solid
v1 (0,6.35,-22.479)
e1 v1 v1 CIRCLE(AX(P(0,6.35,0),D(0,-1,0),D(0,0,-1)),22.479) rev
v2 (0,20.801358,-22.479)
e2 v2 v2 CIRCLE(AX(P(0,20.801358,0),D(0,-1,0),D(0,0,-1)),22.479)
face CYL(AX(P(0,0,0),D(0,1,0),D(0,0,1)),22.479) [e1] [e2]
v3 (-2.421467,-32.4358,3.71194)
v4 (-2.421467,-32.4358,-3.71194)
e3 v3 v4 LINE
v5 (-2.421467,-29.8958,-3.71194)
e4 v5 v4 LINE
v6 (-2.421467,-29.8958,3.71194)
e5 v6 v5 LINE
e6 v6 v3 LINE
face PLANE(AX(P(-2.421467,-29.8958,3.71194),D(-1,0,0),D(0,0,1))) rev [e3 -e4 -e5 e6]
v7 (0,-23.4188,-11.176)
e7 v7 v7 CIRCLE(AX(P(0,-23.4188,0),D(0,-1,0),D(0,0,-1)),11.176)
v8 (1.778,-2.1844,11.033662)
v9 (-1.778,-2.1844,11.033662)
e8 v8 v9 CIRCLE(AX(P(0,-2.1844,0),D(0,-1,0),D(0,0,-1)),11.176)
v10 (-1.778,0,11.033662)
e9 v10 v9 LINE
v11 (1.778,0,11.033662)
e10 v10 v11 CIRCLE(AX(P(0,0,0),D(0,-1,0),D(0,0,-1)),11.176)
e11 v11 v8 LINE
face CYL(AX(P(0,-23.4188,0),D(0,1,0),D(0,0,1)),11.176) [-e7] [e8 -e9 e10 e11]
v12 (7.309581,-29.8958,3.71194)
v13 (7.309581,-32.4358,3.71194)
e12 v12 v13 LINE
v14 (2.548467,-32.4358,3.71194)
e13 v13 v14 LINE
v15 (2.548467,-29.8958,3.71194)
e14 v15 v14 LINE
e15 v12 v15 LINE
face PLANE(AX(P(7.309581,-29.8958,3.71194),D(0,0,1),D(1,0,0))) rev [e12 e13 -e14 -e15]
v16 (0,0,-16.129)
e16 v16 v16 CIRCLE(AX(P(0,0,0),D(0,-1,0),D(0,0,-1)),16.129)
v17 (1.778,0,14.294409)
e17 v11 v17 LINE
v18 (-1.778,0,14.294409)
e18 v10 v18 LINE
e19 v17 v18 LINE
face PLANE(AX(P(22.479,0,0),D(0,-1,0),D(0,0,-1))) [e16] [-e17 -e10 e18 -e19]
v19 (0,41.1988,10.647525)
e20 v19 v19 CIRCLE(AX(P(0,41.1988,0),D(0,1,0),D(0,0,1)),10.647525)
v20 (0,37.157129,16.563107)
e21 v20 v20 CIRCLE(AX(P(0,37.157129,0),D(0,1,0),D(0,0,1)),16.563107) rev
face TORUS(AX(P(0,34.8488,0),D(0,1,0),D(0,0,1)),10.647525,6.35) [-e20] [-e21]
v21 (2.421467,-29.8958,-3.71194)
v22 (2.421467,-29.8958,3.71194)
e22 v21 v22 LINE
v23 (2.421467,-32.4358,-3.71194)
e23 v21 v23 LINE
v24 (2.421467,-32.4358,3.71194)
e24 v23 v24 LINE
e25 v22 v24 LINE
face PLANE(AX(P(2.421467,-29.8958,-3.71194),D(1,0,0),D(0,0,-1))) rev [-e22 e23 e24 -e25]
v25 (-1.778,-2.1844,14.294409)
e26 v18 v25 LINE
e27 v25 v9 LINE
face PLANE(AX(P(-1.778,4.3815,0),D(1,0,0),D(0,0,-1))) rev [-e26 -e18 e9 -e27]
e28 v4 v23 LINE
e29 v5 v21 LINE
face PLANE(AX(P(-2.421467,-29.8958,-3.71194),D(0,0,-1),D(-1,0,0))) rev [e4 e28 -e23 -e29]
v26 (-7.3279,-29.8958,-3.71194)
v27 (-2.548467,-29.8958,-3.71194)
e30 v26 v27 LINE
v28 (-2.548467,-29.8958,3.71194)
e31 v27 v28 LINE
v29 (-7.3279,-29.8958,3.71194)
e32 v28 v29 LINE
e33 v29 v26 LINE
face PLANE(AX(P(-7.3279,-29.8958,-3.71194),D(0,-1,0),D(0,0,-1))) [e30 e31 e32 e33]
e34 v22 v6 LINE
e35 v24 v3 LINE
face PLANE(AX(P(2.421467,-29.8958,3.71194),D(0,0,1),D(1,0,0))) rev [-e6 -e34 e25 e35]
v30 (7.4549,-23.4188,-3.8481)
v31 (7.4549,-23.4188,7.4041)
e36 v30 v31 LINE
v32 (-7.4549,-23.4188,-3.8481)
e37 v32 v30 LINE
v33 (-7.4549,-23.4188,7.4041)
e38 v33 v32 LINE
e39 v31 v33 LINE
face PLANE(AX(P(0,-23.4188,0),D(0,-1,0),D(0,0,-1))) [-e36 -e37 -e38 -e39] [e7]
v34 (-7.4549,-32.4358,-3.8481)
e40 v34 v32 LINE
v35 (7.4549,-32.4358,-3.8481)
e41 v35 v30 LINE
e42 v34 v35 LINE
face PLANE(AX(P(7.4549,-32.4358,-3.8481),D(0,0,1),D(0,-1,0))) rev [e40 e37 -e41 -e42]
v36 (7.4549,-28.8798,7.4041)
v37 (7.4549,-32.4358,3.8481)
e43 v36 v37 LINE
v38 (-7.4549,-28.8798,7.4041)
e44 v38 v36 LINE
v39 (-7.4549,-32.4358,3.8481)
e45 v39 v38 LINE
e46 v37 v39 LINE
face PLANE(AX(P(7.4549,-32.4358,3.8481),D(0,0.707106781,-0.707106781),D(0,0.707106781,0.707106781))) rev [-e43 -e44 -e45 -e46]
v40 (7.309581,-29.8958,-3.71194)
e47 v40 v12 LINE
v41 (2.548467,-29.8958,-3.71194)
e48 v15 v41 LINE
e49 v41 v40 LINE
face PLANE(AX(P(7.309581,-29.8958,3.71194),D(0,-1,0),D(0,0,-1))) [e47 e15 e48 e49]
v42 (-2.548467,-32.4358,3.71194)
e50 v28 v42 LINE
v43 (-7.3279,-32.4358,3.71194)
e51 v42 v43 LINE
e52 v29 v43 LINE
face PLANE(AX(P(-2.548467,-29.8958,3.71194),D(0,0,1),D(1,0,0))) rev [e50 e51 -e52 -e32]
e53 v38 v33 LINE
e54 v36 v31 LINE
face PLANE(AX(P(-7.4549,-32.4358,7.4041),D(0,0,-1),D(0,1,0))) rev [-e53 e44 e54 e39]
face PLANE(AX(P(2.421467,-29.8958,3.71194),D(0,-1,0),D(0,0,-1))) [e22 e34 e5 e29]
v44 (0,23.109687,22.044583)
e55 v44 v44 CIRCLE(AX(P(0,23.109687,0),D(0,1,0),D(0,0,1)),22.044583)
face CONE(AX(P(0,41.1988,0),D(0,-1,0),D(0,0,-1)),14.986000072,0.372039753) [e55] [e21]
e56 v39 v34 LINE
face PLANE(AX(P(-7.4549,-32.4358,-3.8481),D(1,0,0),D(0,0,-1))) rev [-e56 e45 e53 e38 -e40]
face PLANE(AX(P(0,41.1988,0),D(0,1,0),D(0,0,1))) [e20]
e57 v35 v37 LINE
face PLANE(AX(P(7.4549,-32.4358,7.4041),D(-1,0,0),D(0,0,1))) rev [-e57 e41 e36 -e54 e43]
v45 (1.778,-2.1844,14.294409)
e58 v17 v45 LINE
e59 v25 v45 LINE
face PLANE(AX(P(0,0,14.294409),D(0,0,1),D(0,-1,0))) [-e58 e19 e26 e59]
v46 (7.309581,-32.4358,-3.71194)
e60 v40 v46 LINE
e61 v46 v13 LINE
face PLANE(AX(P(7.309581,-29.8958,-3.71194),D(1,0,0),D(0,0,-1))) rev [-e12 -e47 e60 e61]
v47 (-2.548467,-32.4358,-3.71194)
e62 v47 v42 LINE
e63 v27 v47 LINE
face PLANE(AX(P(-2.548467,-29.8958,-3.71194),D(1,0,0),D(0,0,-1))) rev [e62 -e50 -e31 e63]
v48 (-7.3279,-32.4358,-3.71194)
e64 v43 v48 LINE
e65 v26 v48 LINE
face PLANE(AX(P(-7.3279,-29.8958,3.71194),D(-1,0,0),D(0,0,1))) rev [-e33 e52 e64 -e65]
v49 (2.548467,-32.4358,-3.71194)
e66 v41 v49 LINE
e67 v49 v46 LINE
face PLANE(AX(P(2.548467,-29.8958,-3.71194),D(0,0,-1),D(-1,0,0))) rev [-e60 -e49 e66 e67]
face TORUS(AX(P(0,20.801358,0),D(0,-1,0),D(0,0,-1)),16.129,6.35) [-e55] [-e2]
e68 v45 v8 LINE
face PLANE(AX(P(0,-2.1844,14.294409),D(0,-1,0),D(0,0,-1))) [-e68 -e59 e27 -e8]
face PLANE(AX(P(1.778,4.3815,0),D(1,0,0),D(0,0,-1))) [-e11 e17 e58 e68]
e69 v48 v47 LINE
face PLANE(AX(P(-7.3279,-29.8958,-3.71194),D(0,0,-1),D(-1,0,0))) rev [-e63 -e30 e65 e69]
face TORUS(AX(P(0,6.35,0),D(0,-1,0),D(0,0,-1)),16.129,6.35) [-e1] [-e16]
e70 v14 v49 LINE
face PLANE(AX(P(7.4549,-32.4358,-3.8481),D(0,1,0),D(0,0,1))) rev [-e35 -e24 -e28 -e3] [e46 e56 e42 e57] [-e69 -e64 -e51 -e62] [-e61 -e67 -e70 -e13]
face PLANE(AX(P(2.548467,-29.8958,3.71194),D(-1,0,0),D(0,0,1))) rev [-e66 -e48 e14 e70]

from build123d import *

# Parameters (mm, degrees)
SKETCH2_R           = 11.176
BOSS_EXTRUDE1_DEPTH = 23.4188
SKETCH3_W           = 14.9098
SKETCH3_H           = 11.2522
BOSS_EXTRUDE2_DEPTH = 9.017
SKETCH4_W           = 4.842933334
SKETCH4_H           = 7.423880536
CUT_EXTRUDE1_DEPTH  = 2.54
SKETCH5_W           = 4.779433333
SKETCH5_H           = 7.423880536
CUT_EXTRUDE2_DEPTH  = 2.54
SKETCH6_W           = 4.761113869
SKETCH6_H           = 7.423880536
CUT_EXTRUDE3_DEPTH  = 2.54
RIB1_START          = -1.778
RIB1_OUTLINE_W      = 3.294408818
RIB1_OUTLINE_H      = 2.1844
RIB1_DEPTH          = 3.556
CHAMFER1_SIZE       = 3.556
FILLET1_R           = 6.35


# Read off the part's stored shape, not the designer's step: Rib1
with BuildPart() as part:
    # Sketch1 → Revolve1 (revolve)
    with BuildSketch(Plane(origin=(0, 0, 0), x_dir=(-1, 0, 0), z_dir=(0, 0, -1)), mode=Mode.PRIVATE) as revolve1_sk:
        Polygon((-22.479, 0), (0, 0), (0, 41.1988), (-14.986000072, 41.1988), (-22.479, 21.996399801), align=None)
    revolve(revolve1_sk.sketch.rotate(Axis((0, 0, 0), (0, 1, 0)), 270), axis=Axis((0, 0, 0), (0, 1, 0)))

    # Sketch2 → Boss-Extrude1 (add)
    with BuildSketch(Plane.XZ):
        with Locations(Location((0, 0, 0), (0, 0, 270))):
            Circle(SKETCH2_R)
    extrude(amount=BOSS_EXTRUDE1_DEPTH)

    # Sketch3 → Boss-Extrude2 (add)
    with BuildSketch(Plane.XZ.offset(23.4188)):
        with Locations((0, 1.778)):
            Rectangle(SKETCH3_W, SKETCH3_H)
    extrude(amount=BOSS_EXTRUDE2_DEPTH)

    # Sketch4 → Cut-Extrude1 (cut)
    with BuildSketch(Plane.XZ.offset(32.4358)):
        Rectangle(SKETCH4_W, SKETCH4_H)
    extrude(amount=-CUT_EXTRUDE1_DEPTH, mode=Mode.SUBTRACT)

    # Sketch5 → Cut-Extrude2 (cut)
    with BuildSketch(Plane.XZ.offset(32.4358)):
        with Locations((-4.938183334, 0)):
            Rectangle(SKETCH5_W, SKETCH5_H)
    extrude(amount=-CUT_EXTRUDE2_DEPTH, mode=Mode.SUBTRACT)

    # Sketch6 → Cut-Extrude3 (cut)
    with BuildSketch(Plane.XZ.offset(32.4358)):
        with Locations((4.929023601, 0)):
            Rectangle(SKETCH6_W, SKETCH6_H)
    extrude(amount=-CUT_EXTRUDE3_DEPTH, mode=Mode.SUBTRACT)

    # Rib1 outline → Rib1 (add)
    with BuildSketch(Plane(origin=(0, 0, 0), x_dir=(0, 0, -1), z_dir=(1, 0, 0)).offset(RIB1_START)):
        with Locations((-12.647204409, -1.0922)):
            Rectangle(RIB1_OUTLINE_W, RIB1_OUTLINE_H)
    extrude(amount=RIB1_DEPTH)

    # Chamfer1
    chamfer1_edges = [part.edges().sort_by_distance(p)[0] for p in [
        (0, -32.4358, 7.4041),
    ]]
    chamfer(chamfer1_edges, length=CHAMFER1_SIZE)

    # Fillet1
    fillet1_edges = [part.edges().sort_by_distance(p)[0] for p in [
        (0, 21.996399801, -22.479),
        (0, 41.1988, -14.986000072),
        (0, 0, -22.479),
    ]]
    fillet(fillet1_edges, radius=FILLET1_R)


solid = part.part
